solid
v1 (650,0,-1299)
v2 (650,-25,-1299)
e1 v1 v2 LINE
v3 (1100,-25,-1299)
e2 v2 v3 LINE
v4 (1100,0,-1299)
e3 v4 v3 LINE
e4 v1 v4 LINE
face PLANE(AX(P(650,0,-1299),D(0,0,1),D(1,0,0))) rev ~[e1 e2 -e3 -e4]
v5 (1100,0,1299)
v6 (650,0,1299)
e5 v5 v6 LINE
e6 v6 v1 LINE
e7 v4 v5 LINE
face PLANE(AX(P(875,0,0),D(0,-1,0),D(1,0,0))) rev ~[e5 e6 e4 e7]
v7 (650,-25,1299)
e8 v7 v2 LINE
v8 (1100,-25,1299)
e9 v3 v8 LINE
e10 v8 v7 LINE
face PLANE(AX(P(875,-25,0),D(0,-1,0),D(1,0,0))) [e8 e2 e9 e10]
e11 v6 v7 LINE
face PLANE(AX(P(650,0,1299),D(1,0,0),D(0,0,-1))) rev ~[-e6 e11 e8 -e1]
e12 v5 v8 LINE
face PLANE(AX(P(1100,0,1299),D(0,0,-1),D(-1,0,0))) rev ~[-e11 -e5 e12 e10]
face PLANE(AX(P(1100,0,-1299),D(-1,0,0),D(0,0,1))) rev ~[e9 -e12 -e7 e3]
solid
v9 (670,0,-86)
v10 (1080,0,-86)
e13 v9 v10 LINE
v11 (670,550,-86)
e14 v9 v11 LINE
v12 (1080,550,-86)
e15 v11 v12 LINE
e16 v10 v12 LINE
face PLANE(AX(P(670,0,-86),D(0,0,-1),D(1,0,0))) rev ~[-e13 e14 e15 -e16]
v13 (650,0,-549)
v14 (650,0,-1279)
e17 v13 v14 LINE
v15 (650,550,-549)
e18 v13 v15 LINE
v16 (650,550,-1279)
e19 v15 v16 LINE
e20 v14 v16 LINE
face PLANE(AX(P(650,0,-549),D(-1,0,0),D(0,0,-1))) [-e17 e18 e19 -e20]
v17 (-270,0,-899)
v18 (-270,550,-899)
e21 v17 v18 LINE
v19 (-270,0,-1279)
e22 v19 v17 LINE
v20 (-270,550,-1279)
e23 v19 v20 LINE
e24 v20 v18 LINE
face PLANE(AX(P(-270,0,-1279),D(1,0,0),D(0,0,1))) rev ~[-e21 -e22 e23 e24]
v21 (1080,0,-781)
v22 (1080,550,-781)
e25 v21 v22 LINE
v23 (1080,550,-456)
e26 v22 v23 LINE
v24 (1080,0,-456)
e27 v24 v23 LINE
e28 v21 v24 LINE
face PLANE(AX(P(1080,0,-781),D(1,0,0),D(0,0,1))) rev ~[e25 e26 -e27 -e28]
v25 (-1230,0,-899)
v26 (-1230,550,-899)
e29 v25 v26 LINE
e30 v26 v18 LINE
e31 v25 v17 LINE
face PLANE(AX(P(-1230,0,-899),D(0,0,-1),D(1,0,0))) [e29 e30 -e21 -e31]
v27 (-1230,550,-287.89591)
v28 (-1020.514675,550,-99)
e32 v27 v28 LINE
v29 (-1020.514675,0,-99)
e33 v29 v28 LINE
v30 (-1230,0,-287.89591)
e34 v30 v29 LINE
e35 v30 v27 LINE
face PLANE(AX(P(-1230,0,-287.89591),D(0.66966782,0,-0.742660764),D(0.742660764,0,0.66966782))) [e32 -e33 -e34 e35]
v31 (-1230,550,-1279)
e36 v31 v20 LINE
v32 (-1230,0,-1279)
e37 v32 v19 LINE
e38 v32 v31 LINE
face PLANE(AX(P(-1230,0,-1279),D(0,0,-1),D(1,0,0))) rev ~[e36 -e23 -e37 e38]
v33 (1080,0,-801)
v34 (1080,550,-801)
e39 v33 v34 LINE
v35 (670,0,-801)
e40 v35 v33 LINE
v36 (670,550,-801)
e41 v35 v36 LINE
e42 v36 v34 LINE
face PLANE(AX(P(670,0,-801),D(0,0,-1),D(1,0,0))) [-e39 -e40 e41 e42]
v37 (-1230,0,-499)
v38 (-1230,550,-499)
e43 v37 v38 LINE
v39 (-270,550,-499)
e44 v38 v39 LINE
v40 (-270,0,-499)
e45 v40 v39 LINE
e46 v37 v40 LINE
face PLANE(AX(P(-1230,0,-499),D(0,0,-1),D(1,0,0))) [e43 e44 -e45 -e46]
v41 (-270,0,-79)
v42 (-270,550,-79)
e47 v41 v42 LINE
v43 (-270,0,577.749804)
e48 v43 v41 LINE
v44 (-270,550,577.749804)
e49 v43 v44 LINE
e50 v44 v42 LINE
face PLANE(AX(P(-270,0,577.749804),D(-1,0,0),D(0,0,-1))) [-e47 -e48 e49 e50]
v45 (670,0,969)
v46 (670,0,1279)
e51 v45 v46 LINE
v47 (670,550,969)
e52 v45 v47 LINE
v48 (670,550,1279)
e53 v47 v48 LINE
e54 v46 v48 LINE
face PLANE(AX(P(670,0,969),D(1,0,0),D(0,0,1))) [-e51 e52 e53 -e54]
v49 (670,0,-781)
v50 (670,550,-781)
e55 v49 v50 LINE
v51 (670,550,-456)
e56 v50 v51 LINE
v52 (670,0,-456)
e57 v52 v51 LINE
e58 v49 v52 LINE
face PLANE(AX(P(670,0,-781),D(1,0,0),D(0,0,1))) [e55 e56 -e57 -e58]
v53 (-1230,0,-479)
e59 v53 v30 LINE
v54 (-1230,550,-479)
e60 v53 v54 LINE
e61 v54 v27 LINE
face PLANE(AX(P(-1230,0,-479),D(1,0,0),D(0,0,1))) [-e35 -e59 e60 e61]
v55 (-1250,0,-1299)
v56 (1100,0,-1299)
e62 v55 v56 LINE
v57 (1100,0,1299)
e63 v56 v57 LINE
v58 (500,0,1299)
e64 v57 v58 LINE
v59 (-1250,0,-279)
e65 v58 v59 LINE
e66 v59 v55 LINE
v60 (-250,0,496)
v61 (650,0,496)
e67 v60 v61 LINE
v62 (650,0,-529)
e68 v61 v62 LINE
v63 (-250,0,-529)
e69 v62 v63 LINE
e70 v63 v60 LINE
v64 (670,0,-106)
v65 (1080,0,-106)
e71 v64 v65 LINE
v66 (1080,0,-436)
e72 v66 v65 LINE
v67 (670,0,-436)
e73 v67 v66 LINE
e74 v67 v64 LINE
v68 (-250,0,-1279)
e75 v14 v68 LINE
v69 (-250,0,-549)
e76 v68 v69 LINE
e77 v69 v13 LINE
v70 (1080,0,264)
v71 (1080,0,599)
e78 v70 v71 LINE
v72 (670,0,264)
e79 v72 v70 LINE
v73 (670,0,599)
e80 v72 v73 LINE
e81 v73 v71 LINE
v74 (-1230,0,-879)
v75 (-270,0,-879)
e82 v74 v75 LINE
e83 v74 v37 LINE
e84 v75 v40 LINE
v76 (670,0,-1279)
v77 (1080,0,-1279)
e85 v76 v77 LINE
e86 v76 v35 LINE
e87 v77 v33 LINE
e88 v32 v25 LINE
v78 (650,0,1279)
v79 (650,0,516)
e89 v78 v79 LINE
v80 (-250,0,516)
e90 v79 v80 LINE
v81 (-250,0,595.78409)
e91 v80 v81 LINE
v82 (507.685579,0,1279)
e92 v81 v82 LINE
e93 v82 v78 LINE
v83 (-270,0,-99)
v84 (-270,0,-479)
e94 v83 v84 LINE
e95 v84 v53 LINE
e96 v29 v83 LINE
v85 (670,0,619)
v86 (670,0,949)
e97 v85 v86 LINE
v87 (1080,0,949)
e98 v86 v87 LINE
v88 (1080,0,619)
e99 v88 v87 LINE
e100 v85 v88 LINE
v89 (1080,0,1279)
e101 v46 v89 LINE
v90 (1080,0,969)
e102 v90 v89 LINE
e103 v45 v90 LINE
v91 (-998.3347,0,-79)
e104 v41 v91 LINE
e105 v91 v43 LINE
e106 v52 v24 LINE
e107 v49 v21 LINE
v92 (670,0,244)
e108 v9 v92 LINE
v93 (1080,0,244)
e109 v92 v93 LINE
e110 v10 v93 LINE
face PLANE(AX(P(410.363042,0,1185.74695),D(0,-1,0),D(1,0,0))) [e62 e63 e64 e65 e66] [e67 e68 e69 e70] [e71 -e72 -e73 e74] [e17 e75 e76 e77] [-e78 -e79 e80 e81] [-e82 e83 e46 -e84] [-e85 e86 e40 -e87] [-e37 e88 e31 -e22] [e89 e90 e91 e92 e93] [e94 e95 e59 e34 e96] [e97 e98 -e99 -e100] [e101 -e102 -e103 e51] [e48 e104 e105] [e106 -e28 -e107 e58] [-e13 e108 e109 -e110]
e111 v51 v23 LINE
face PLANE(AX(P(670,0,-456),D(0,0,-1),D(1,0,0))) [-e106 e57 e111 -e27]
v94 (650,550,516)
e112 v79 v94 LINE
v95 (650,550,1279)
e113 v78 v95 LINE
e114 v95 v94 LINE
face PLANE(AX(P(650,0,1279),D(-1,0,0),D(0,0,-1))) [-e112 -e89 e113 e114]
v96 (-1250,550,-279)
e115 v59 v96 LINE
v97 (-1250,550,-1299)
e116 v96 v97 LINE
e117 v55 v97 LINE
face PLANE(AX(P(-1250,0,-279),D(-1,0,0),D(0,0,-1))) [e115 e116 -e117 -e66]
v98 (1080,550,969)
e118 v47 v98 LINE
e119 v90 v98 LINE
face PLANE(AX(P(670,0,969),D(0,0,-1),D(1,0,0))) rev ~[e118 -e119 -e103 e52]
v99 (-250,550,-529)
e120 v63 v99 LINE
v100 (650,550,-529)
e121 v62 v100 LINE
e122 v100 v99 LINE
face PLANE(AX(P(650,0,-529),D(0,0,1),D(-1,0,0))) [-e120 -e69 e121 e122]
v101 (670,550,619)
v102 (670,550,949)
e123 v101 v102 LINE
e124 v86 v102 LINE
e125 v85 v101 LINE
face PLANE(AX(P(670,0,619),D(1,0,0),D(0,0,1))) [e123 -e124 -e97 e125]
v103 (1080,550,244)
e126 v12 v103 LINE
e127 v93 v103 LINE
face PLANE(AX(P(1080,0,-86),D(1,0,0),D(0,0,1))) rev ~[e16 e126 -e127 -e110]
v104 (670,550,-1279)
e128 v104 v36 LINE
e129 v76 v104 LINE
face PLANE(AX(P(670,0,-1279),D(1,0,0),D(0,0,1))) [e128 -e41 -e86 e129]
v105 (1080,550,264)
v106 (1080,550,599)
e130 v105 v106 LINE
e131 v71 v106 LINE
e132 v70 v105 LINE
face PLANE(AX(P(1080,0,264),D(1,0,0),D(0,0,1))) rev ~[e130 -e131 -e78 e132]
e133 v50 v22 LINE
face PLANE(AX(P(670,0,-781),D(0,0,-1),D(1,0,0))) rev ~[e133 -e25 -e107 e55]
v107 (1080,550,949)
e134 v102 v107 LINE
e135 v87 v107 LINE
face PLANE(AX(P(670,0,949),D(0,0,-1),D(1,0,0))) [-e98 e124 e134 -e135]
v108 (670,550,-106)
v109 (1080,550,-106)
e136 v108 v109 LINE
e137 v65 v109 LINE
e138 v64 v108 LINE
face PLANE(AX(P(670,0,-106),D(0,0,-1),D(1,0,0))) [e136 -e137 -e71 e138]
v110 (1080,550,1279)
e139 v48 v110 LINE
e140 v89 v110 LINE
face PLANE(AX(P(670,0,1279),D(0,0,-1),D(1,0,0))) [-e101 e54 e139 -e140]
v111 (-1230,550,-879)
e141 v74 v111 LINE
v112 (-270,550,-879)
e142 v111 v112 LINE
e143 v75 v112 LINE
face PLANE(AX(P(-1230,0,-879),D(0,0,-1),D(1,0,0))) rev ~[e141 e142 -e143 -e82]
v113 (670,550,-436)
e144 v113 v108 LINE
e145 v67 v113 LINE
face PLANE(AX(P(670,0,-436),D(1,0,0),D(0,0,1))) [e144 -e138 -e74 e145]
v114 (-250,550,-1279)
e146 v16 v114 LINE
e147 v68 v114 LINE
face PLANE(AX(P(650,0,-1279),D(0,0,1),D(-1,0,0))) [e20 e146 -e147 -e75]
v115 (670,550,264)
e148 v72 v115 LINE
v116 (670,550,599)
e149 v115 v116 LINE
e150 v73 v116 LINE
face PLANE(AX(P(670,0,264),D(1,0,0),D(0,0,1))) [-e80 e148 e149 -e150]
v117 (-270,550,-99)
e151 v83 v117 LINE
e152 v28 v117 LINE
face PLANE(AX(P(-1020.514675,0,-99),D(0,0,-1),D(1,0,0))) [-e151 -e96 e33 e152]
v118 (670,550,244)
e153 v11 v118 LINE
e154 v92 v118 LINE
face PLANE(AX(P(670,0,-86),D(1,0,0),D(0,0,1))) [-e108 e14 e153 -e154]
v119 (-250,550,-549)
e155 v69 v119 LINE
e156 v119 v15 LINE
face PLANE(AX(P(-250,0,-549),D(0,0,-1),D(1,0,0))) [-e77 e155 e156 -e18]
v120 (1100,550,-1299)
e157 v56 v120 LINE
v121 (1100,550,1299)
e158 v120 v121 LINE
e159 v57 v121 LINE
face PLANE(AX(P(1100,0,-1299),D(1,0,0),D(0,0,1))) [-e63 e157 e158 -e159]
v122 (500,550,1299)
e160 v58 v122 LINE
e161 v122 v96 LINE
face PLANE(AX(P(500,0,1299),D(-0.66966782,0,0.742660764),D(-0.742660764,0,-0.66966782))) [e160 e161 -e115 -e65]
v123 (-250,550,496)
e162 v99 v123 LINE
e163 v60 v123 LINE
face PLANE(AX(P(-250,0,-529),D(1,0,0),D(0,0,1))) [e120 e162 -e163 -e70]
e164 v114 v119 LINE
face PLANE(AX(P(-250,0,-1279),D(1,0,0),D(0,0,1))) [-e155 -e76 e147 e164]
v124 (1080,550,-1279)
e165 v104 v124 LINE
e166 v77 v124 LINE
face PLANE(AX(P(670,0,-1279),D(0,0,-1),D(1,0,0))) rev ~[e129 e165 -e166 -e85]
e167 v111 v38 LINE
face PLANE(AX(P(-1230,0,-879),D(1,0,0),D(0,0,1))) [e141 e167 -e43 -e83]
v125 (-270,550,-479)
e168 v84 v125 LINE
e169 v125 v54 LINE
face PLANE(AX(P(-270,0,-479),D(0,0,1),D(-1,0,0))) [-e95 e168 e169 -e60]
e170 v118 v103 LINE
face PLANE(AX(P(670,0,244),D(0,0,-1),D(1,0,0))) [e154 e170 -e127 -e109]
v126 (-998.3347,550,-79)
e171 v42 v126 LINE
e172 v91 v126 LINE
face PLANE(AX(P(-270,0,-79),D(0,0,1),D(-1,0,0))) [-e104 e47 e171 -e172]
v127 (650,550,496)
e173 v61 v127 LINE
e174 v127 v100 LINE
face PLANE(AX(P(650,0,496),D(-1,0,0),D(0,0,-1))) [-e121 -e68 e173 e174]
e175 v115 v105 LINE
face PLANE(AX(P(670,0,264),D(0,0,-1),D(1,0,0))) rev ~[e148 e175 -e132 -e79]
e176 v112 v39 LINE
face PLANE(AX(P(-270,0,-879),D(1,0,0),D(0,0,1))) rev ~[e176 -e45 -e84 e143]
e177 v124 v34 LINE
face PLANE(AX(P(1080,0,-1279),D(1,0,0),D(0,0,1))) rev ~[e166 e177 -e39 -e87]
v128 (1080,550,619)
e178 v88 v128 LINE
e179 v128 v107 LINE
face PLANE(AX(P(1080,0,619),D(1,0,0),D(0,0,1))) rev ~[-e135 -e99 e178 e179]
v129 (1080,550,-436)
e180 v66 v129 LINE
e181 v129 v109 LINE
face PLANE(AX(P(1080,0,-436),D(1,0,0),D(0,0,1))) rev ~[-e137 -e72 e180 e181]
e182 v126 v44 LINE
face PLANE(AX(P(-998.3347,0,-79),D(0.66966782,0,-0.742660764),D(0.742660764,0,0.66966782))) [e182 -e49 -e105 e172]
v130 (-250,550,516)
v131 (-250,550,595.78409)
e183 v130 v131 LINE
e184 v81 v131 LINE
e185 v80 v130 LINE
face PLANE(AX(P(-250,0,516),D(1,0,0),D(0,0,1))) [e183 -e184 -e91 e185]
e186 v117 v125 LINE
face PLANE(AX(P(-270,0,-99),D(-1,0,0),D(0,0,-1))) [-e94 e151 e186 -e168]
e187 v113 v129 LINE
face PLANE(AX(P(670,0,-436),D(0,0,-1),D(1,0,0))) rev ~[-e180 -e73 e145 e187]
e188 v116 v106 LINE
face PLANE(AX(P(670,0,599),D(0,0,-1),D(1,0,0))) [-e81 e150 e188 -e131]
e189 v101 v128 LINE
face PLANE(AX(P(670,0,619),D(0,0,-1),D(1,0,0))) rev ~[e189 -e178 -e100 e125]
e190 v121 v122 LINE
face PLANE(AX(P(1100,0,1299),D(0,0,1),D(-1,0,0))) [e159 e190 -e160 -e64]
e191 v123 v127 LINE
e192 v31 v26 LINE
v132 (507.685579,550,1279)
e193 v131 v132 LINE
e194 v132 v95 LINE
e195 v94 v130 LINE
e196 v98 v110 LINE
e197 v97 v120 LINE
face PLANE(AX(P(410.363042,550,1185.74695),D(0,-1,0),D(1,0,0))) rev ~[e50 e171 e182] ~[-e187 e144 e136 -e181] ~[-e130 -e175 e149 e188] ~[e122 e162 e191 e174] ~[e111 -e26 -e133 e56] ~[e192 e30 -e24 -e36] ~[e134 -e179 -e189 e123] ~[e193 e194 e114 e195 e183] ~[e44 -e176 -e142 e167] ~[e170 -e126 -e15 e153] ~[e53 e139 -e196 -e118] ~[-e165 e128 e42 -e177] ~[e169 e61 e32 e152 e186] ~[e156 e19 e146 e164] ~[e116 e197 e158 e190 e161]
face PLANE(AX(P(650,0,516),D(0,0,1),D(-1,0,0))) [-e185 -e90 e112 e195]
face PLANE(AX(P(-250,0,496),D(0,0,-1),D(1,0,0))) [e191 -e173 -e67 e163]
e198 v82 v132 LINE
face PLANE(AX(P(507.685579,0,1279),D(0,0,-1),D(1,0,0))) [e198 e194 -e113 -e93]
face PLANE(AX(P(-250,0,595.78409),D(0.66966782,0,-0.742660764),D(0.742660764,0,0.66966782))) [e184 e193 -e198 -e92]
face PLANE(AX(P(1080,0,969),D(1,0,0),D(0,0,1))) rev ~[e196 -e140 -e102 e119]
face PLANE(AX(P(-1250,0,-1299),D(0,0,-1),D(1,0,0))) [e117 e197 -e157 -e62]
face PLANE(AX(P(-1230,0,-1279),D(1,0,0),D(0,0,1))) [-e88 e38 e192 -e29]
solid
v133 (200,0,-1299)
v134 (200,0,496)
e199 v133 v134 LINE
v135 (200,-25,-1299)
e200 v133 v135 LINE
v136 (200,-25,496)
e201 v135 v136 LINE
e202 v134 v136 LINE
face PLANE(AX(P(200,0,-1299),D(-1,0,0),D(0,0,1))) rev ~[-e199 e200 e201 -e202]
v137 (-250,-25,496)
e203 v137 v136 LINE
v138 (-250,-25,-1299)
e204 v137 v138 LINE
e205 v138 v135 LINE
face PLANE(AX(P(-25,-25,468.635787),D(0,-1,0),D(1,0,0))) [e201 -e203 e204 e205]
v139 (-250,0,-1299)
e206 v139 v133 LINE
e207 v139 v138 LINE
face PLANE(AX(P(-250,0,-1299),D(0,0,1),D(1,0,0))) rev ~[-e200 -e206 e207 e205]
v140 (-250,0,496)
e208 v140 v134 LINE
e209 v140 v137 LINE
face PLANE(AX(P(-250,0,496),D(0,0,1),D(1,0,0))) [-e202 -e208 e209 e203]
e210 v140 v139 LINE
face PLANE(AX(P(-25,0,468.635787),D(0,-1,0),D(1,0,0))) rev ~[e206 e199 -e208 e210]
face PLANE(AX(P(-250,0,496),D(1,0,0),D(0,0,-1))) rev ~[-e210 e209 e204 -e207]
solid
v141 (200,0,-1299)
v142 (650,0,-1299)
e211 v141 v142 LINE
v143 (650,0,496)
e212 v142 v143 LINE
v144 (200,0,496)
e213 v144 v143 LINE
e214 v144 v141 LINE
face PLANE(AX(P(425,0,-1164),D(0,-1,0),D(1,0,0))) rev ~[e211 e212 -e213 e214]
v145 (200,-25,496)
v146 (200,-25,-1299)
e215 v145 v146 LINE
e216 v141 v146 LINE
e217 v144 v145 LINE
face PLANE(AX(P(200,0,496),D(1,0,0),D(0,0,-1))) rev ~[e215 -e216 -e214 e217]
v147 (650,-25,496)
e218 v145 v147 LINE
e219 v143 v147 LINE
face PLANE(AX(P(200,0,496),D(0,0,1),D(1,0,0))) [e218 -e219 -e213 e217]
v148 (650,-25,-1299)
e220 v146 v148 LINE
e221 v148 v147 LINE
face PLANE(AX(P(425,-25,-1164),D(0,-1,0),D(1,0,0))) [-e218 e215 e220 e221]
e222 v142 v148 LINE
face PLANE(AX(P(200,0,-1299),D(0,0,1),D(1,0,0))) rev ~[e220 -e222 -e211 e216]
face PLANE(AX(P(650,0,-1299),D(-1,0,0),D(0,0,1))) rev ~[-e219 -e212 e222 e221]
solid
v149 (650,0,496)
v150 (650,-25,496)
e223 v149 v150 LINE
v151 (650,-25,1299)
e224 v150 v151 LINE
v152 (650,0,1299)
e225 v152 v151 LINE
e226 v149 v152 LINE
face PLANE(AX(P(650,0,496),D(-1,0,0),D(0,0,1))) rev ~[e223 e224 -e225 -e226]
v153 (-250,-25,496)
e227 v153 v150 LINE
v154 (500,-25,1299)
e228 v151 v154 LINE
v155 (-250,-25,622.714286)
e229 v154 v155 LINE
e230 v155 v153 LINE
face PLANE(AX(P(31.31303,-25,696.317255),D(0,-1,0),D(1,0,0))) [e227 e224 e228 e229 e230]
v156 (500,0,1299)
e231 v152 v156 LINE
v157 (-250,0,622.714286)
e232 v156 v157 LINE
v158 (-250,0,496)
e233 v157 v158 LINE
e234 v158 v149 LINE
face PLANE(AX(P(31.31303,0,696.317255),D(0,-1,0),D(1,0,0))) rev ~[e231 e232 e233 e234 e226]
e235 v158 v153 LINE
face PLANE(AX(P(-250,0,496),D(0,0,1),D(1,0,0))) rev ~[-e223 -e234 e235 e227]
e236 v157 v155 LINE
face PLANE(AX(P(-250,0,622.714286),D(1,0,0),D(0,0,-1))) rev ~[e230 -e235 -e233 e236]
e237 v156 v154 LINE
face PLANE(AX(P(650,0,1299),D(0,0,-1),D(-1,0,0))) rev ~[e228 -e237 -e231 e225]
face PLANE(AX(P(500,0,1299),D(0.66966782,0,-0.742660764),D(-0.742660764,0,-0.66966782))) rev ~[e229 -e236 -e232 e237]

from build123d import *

# Parameters (mm, degrees)
F0_W     = 410
F0_H     = 478
F0_H_2   = 325
F0_H_3   = 330
F0_H_4   = 335
F0_H_5   = 310
F0_W_2   = 960
F0_H_6   = 380
F0_W_3   = 450
F0_H_7   = 20
F1_DEPTH = 550
F2_DEPTH = 25
F0_H_8   = 54.7284266949
F0_H_9   = 960.2715733051
F0_H_10  = 10
F0_H_11  = 250
F0_H_12  = 230
F3_DEPTH = 25
F4_DEPTH = 25
F5_DEPTH = 25


# Not quite as in the source:
# - a feature names something its author has since deleted; it is built from what else it names


with BuildPart() as f1:
    # F0 (on Front) → F1 (new body)
    with BuildSketch(Plane.XZ):
        Polygon((650, 1299), (500, 1299), (200, 1028.4857142857), (200, 1001.5555181998), (507.6855786757, 1279), (650, 1279), align=None)
        Polygon((1100, 1299), (650, 1299), (650, 1279), (650, 516), (650, 496), (650, 441.2715733051), (650, 431.2715733051), (650, -529), (650, -549), (650, -799), (650, -1049), (650, -1279), (650, -1299), (1100, -1299), (1100, -456), (1100, -436), align=None)
        with Locations((875, -1040)):
            Rectangle(F0_W, F0_H, mode=Mode.SUBTRACT)
        with Locations((875, -618.5)):
            Rectangle(F0_W, F0_H_2, mode=Mode.SUBTRACT)
        with Locations((875, -271)):
            Rectangle(F0_W, F0_H_3, mode=Mode.SUBTRACT)
        with Locations((875, 79)):
            Rectangle(F0_W, F0_H_3, mode=Mode.SUBTRACT)
        with Locations((875, 431.5)):
            Rectangle(F0_W, F0_H_4, mode=Mode.SUBTRACT)
        with Locations((875, 784)):
            Rectangle(F0_W, F0_H_3, mode=Mode.SUBTRACT)
        with Locations((875, 1124)):
            Rectangle(F0_W, F0_H_5, mode=Mode.SUBTRACT)
        Polygon((200, 1001.5555181998), (200, 1028.4857142857), (-250, 622.7142857143), (-250, 595.7840896284), align=None)
        Polygon((-250, 595.7840896284), (-250, 622.7142857143), (-1250, -279), (-1250, -479), (-1247.8080965606, -479), (-1230, -462.9421849299), (-1230, -287.8959103716), (-1020.5146748097, -99), (-998.3347001582, -79), (-270, 577.7498039141), align=None)
        Polygon((-250, 516), (-250, 595.7840896284), (-270, 577.7498039141), (-270, -79), (-998.3347001582, -79), (-1020.5146748097, -99), (-270, -99), (-270, -479), (-1230, -479), (-1230, -462.9421849299), (-1247.8080965606, -479), (-1250, -480.9764706442), (-1250, -1299), (-250, -1299), (-250, -1279), (-250, -1049), (-250, -899), (-250, -879), (-250, -799), (-250, -549), (-250, -529), (-250, 431.2715733051), (-250, 441.2715733051), (-250, 496), align=None)
        with Locations((-750, -1089)):
            Rectangle(F0_W_2, F0_H_6, mode=Mode.SUBTRACT)
        with Locations((-750, -689)):
            Rectangle(F0_W_2, F0_H_6, mode=Mode.SUBTRACT)
        Polygon((-1247.8080965606, -479), (-1250, -479), (-1250, -480.9764706442), align=None)
        with Locations((425, -1289)):
            Rectangle(F0_W_3, F0_H_7)
        with Locations((-25, -1289)):
            Rectangle(F0_W_3, F0_H_7)
        with Locations((-25, -539)):
            Rectangle(F0_W_3, F0_H_7)
        with Locations((425, -539)):
            Rectangle(F0_W_3, F0_H_7)
        with Locations((425, 506)):
            Rectangle(F0_W_3, F0_H_7)
        with Locations((-25, 506)):
            Rectangle(F0_W_3, F0_H_7)
    extrude(amount=-F1_DEPTH)


with BuildPart() as f2:
    # F0 (on Front) → F2 (new body)
    with BuildSketch(Plane.XZ):
        Polygon((200, 516), (200, 1001.5555181998), (-250, 595.7840896284), (-250, 516), align=None)
        with Locations((-25, 506)):
            Rectangle(F0_W_3, F0_H_7)
        Polygon((650, 516), (650, 1279), (507.6855786757, 1279), (200, 1001.5555181998), (200, 516), align=None)
        with Locations((425, 506)):
            Rectangle(F0_W_3, F0_H_7)
        Polygon((200, 1001.5555181998), (200, 1028.4857142857), (-250, 622.7142857143), (-250, 595.7840896284), align=None)
        Polygon((650, 1299), (500, 1299), (200, 1028.4857142857), (200, 1001.5555181998), (507.6855786757, 1279), (650, 1279), align=None)
    extrude(amount=F2_DEPTH)


with BuildPart() as f3:
    # F0 (on Front) → F3 (new body)
    with BuildSketch(Plane.XZ):
        with Locations((-25, 468.6357866526)):
            Rectangle(F0_W_3, F0_H_8)
        with Locations((-25, -48.8642133474)):
            Rectangle(F0_W_3, F0_H_9)
        with Locations((-25, 436.2715733051)):
            Rectangle(F0_W_3, F0_H_10)
        with Locations((-25, -674)):
            Rectangle(F0_W_3, F0_H_11)
        Polygon((-250, -1049), (200, -1049), (200, -799), (-250, -799), (-250, -879), (-250, -899), align=None)
        with Locations((-25, -1164)):
            Rectangle(F0_W_3, F0_H_12)
        with Locations((-25, -539)):
            Rectangle(F0_W_3, F0_H_7)
        with Locations((-25, -1289)):
            Rectangle(F0_W_3, F0_H_7)
    extrude(amount=F3_DEPTH)


with BuildPart() as f4:
    # F0 (on Front) → F4 (new body)
    with BuildSketch(Plane.XZ):
        with Locations((425, -1164)):
            Rectangle(F0_W_3, F0_H_12)
        with Locations((425, -924)):
            Rectangle(F0_W_3, F0_H_11)
        with Locations((425, -1289)):
            Rectangle(F0_W_3, F0_H_7)
        with Locations((425, -674)):
            Rectangle(F0_W_3, F0_H_11)
        with Locations((425, -539)):
            Rectangle(F0_W_3, F0_H_7)
        with Locations((425, -48.8642133474)):
            Rectangle(F0_W_3, F0_H_9)
        with Locations((425, 468.6357866526)):
            Rectangle(F0_W_3, F0_H_8)
        with Locations((425, 436.2715733051)):
            Rectangle(F0_W_3, F0_H_10)
    extrude(amount=F4_DEPTH)


with BuildPart() as f5:
    # F0 (on Front) → F5 (new body)
    with BuildSketch(Plane.XZ):
        Polygon((1100, 1299), (650, 1299), (650, 1279), (650, 516), (650, 496), (650, 441.2715733051), (650, 431.2715733051), (650, -529), (650, -549), (650, -799), (650, -1049), (650, -1279), (650, -1299), (1100, -1299), (1100, -456), (1100, -436), align=None)
        with Locations((875, -1040)):
            Rectangle(F0_W, F0_H, mode=Mode.SUBTRACT)
        with Locations((875, -618.5)):
            Rectangle(F0_W, F0_H_2, mode=Mode.SUBTRACT)
        with Locations((875, -271)):
            Rectangle(F0_W, F0_H_3, mode=Mode.SUBTRACT)
        with Locations((875, 79)):
            Rectangle(F0_W, F0_H_3, mode=Mode.SUBTRACT)
        with Locations((875, 431.5)):
            Rectangle(F0_W, F0_H_4, mode=Mode.SUBTRACT)
        with Locations((875, 784)):
            Rectangle(F0_W, F0_H_3, mode=Mode.SUBTRACT)
        with Locations((875, 1124)):
            Rectangle(F0_W, F0_H_5, mode=Mode.SUBTRACT)
        with Locations((875, -1040)):
            Rectangle(F0_W, F0_H)
        with Locations((875, 431.5)):
            Rectangle(F0_W, F0_H_4)
        with Locations((875, 784)):
            Rectangle(F0_W, F0_H_3)
        with Locations((875, 79)):
            Rectangle(F0_W, F0_H_3)
        with Locations((875, -271)):
            Rectangle(F0_W, F0_H_3)
        with Locations((875, -618.5)):
            Rectangle(F0_W, F0_H_2)
        with Locations((875, 1124)):
            Rectangle(F0_W, F0_H_5)
    extrude(amount=F5_DEPTH)


solid = Compound([f1.part, f2.part, f3.part, f4.part, f5.part])
